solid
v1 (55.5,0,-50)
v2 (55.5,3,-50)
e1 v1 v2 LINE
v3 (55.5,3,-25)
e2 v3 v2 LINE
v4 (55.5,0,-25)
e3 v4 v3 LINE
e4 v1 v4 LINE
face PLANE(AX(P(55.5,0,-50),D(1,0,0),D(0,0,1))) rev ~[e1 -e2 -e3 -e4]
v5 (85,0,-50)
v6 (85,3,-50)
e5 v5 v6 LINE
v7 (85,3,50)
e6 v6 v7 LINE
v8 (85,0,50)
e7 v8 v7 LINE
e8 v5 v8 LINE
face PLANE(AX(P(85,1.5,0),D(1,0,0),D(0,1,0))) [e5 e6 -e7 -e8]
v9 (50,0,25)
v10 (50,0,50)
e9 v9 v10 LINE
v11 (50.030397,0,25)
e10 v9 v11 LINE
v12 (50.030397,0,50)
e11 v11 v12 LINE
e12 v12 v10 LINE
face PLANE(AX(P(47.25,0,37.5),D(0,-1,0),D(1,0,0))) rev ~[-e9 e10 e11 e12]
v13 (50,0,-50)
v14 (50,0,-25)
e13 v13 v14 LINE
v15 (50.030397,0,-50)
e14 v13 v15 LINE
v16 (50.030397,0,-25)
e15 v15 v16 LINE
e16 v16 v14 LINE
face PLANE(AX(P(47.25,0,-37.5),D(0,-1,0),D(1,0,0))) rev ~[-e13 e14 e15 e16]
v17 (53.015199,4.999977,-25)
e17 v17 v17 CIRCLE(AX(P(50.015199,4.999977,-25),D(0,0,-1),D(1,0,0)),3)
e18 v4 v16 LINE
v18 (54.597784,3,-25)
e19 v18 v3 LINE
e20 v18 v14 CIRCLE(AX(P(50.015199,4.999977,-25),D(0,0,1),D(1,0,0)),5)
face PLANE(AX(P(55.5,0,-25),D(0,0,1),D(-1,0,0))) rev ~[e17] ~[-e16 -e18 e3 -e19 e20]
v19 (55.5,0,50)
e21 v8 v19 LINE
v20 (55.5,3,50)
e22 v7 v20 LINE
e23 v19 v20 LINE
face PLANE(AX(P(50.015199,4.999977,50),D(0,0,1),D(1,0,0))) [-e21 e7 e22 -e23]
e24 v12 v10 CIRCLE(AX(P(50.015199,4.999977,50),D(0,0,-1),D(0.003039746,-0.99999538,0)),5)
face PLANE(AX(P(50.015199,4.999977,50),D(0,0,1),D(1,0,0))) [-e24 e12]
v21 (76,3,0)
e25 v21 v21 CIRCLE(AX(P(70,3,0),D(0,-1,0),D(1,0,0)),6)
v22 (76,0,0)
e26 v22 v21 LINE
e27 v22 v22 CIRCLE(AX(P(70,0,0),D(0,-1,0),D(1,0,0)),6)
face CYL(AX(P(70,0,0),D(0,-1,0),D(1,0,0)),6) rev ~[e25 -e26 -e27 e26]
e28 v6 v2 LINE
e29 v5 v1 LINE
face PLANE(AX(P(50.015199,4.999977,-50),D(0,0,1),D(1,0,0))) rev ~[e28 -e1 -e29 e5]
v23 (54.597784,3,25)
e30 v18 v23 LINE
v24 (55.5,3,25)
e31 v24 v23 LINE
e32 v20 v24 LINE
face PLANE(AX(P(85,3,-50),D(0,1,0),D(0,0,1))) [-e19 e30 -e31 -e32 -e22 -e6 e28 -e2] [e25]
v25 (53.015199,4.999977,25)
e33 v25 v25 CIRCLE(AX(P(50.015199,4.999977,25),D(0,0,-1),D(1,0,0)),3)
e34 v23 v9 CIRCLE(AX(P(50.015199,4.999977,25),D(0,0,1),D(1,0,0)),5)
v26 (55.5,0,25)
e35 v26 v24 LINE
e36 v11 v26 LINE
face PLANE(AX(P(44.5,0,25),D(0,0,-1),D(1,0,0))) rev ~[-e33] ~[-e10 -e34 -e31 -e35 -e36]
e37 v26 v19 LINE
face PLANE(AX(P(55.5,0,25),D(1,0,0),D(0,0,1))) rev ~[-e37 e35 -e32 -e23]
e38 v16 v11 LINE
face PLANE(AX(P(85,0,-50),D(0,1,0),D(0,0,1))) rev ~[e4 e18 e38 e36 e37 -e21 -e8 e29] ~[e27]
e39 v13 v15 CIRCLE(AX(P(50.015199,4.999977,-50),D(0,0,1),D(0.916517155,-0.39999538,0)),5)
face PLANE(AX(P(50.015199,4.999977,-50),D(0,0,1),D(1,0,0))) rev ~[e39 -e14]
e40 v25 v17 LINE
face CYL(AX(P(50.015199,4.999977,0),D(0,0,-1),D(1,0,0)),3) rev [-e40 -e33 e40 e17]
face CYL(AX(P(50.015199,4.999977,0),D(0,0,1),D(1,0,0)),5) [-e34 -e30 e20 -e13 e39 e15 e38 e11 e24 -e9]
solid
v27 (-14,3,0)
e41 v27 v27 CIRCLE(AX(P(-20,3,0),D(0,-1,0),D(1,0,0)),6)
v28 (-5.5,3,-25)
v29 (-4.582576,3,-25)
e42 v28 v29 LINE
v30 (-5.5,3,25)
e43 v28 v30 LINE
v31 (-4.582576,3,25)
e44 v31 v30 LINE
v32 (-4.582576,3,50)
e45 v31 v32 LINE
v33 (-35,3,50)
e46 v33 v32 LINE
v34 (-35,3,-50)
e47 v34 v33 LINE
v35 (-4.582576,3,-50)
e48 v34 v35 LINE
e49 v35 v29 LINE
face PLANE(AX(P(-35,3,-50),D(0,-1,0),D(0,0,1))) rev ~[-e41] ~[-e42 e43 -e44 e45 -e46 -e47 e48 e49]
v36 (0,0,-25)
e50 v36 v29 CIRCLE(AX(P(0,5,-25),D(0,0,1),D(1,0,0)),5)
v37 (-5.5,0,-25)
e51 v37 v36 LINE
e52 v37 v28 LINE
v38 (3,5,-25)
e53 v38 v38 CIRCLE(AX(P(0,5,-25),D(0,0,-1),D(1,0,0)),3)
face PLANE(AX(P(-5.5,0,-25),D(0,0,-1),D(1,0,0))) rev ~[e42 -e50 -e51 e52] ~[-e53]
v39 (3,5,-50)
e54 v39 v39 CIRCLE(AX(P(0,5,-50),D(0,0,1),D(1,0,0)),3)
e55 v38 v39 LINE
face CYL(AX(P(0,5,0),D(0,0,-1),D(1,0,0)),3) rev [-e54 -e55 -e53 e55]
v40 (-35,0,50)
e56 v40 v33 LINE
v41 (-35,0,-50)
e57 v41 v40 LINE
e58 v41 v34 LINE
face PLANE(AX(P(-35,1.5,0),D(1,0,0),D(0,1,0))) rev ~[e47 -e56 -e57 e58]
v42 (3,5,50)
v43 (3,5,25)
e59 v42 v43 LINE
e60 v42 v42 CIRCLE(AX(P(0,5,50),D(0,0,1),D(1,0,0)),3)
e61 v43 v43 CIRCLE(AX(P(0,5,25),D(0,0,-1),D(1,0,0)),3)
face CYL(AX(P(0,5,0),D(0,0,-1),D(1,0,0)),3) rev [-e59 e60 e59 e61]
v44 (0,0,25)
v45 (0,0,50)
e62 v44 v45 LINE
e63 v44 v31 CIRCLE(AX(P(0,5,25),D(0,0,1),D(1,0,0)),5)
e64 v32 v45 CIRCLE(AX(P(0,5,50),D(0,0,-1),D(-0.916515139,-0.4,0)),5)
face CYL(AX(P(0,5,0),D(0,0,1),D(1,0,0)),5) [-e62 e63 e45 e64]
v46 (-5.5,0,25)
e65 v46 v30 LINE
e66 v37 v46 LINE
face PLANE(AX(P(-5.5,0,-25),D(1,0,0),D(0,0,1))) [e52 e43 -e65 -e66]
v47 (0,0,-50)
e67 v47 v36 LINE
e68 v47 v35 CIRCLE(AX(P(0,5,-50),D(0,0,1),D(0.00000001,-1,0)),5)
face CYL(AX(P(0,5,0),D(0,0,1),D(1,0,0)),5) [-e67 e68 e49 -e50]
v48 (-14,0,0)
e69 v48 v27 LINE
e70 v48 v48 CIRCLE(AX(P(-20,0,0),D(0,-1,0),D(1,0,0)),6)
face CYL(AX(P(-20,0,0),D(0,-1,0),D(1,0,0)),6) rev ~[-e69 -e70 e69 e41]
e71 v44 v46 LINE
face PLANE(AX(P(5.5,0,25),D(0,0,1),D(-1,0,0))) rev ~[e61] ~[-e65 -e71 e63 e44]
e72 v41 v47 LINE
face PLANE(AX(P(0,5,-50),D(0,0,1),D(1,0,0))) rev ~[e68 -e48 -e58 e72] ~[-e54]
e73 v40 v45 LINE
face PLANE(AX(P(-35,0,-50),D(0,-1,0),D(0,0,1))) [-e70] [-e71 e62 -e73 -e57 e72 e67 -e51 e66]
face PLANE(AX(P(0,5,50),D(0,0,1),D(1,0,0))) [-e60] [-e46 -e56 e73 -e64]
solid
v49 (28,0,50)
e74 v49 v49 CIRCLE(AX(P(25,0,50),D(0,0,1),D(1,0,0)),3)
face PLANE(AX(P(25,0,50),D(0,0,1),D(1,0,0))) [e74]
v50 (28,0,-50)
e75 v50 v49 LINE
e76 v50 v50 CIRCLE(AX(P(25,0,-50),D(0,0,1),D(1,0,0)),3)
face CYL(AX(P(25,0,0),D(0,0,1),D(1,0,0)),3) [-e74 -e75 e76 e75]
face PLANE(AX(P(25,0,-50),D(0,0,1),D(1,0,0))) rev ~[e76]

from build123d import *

# Parameters (mm, degrees)
F1_R      = 5
F1_R_2    = 3
F2_DEPTH  = 50
F4_W      = 3
F4_H      = 100
F0_R      = 6
F6_DEPTH  = 3
F0_W      = 5.5
F0_H      = 50
F7_DEPTH  = 11
F10_R     = 5
F10_R_2   = 3
F11_DEPTH = 50
F13_W     = 3
F13_H     = 100
F9_R      = 6
F15_DEPTH = 3
F9_W      = 5.5
F9_H      = 25
F16_DEPTH = 11
F18_R     = 3
F19_DEPTH = 50


with BuildPart() as f2:
    # F1 (on Top) → F2 (new body, symmetric)
    with BuildSketch(Plane.XY):
        with Locations((0, 5)):
            Circle(F1_R)
        with Locations((0, 5)):
            Circle(F1_R_2, mode=Mode.SUBTRACT)
    extrude(amount=F2_DEPTH, both=True)

    # F4 (on offset) → F5 (join, up to the next surface of F2)
    with BuildSketch(Plane.YZ.offset(-35)):
        with Locations((1.5, 0)):
            Rectangle(F4_W, F4_H)
    extrude(until=Until.NEXT)

    # F0 (on Front) → F6 (cut, through all)
    with BuildSketch(Plane.XZ):
        with Locations((-20, 0)):
            Circle(F0_R)
    extrude(amount=-F6_DEPTH, mode=Mode.SUBTRACT)

    # F0 (on Front) → F7 (cut)
    with BuildSketch(Plane.XZ):
        with Locations((2.75, 0)):
            Rectangle(F0_W, F0_H)
        with Locations((-2.75, 0)):
            Rectangle(F0_W, F0_H)
    extrude(amount=-F7_DEPTH, mode=Mode.SUBTRACT)


with BuildPart() as f11:
    # F10 (on Top) → F11 (new body, symmetric)
    with BuildSketch(Plane.XY):
        with Locations((50.0151987175, 4.9999768998)):
            Circle(F10_R)
        with Locations((50.0151987175, 4.9999768998)):
            Circle(F10_R_2, mode=Mode.SUBTRACT)
    extrude(amount=F11_DEPTH, both=True)

    # F13 (on offset) → F14 (join, up to the next surface of F11)
    with BuildSketch(Plane.YZ.offset(85)):
        with Locations((1.5, 0)):
            Rectangle(F13_W, F13_H)
    extrude(until=Until.NEXT, dir=(-1, 0, 0))

    # F9 (on Front) → F15 (cut, through all)
    with BuildSketch(Plane.XZ):
        with Locations((70, 0)):
            Circle(F9_R)
    extrude(amount=-F15_DEPTH, mode=Mode.SUBTRACT)

    # F9 (on Front) → F16 (cut)
    with BuildSketch(Plane.XZ):
        with Locations((47.25, -37.5)):
            Rectangle(F9_W, F9_H)
        with Locations((47.25, 37.5)):
            Rectangle(F9_W, F9_H)
        with Locations((52.75, 37.5)):
            Rectangle(F9_W, F9_H)
        with Locations((52.75, -37.5)):
            Rectangle(F9_W, F9_H)
    extrude(amount=-F16_DEPTH, mode=Mode.SUBTRACT)


with BuildPart() as f19:
    # F18 (on Top) → F19 (new body, symmetric)
    with BuildSketch(Plane.XY):
        with Locations((25, 0)):
            Circle(F18_R)
    extrude(amount=F19_DEPTH, both=True)


solid = Compound([f2.part, f11.part, f19.part])
